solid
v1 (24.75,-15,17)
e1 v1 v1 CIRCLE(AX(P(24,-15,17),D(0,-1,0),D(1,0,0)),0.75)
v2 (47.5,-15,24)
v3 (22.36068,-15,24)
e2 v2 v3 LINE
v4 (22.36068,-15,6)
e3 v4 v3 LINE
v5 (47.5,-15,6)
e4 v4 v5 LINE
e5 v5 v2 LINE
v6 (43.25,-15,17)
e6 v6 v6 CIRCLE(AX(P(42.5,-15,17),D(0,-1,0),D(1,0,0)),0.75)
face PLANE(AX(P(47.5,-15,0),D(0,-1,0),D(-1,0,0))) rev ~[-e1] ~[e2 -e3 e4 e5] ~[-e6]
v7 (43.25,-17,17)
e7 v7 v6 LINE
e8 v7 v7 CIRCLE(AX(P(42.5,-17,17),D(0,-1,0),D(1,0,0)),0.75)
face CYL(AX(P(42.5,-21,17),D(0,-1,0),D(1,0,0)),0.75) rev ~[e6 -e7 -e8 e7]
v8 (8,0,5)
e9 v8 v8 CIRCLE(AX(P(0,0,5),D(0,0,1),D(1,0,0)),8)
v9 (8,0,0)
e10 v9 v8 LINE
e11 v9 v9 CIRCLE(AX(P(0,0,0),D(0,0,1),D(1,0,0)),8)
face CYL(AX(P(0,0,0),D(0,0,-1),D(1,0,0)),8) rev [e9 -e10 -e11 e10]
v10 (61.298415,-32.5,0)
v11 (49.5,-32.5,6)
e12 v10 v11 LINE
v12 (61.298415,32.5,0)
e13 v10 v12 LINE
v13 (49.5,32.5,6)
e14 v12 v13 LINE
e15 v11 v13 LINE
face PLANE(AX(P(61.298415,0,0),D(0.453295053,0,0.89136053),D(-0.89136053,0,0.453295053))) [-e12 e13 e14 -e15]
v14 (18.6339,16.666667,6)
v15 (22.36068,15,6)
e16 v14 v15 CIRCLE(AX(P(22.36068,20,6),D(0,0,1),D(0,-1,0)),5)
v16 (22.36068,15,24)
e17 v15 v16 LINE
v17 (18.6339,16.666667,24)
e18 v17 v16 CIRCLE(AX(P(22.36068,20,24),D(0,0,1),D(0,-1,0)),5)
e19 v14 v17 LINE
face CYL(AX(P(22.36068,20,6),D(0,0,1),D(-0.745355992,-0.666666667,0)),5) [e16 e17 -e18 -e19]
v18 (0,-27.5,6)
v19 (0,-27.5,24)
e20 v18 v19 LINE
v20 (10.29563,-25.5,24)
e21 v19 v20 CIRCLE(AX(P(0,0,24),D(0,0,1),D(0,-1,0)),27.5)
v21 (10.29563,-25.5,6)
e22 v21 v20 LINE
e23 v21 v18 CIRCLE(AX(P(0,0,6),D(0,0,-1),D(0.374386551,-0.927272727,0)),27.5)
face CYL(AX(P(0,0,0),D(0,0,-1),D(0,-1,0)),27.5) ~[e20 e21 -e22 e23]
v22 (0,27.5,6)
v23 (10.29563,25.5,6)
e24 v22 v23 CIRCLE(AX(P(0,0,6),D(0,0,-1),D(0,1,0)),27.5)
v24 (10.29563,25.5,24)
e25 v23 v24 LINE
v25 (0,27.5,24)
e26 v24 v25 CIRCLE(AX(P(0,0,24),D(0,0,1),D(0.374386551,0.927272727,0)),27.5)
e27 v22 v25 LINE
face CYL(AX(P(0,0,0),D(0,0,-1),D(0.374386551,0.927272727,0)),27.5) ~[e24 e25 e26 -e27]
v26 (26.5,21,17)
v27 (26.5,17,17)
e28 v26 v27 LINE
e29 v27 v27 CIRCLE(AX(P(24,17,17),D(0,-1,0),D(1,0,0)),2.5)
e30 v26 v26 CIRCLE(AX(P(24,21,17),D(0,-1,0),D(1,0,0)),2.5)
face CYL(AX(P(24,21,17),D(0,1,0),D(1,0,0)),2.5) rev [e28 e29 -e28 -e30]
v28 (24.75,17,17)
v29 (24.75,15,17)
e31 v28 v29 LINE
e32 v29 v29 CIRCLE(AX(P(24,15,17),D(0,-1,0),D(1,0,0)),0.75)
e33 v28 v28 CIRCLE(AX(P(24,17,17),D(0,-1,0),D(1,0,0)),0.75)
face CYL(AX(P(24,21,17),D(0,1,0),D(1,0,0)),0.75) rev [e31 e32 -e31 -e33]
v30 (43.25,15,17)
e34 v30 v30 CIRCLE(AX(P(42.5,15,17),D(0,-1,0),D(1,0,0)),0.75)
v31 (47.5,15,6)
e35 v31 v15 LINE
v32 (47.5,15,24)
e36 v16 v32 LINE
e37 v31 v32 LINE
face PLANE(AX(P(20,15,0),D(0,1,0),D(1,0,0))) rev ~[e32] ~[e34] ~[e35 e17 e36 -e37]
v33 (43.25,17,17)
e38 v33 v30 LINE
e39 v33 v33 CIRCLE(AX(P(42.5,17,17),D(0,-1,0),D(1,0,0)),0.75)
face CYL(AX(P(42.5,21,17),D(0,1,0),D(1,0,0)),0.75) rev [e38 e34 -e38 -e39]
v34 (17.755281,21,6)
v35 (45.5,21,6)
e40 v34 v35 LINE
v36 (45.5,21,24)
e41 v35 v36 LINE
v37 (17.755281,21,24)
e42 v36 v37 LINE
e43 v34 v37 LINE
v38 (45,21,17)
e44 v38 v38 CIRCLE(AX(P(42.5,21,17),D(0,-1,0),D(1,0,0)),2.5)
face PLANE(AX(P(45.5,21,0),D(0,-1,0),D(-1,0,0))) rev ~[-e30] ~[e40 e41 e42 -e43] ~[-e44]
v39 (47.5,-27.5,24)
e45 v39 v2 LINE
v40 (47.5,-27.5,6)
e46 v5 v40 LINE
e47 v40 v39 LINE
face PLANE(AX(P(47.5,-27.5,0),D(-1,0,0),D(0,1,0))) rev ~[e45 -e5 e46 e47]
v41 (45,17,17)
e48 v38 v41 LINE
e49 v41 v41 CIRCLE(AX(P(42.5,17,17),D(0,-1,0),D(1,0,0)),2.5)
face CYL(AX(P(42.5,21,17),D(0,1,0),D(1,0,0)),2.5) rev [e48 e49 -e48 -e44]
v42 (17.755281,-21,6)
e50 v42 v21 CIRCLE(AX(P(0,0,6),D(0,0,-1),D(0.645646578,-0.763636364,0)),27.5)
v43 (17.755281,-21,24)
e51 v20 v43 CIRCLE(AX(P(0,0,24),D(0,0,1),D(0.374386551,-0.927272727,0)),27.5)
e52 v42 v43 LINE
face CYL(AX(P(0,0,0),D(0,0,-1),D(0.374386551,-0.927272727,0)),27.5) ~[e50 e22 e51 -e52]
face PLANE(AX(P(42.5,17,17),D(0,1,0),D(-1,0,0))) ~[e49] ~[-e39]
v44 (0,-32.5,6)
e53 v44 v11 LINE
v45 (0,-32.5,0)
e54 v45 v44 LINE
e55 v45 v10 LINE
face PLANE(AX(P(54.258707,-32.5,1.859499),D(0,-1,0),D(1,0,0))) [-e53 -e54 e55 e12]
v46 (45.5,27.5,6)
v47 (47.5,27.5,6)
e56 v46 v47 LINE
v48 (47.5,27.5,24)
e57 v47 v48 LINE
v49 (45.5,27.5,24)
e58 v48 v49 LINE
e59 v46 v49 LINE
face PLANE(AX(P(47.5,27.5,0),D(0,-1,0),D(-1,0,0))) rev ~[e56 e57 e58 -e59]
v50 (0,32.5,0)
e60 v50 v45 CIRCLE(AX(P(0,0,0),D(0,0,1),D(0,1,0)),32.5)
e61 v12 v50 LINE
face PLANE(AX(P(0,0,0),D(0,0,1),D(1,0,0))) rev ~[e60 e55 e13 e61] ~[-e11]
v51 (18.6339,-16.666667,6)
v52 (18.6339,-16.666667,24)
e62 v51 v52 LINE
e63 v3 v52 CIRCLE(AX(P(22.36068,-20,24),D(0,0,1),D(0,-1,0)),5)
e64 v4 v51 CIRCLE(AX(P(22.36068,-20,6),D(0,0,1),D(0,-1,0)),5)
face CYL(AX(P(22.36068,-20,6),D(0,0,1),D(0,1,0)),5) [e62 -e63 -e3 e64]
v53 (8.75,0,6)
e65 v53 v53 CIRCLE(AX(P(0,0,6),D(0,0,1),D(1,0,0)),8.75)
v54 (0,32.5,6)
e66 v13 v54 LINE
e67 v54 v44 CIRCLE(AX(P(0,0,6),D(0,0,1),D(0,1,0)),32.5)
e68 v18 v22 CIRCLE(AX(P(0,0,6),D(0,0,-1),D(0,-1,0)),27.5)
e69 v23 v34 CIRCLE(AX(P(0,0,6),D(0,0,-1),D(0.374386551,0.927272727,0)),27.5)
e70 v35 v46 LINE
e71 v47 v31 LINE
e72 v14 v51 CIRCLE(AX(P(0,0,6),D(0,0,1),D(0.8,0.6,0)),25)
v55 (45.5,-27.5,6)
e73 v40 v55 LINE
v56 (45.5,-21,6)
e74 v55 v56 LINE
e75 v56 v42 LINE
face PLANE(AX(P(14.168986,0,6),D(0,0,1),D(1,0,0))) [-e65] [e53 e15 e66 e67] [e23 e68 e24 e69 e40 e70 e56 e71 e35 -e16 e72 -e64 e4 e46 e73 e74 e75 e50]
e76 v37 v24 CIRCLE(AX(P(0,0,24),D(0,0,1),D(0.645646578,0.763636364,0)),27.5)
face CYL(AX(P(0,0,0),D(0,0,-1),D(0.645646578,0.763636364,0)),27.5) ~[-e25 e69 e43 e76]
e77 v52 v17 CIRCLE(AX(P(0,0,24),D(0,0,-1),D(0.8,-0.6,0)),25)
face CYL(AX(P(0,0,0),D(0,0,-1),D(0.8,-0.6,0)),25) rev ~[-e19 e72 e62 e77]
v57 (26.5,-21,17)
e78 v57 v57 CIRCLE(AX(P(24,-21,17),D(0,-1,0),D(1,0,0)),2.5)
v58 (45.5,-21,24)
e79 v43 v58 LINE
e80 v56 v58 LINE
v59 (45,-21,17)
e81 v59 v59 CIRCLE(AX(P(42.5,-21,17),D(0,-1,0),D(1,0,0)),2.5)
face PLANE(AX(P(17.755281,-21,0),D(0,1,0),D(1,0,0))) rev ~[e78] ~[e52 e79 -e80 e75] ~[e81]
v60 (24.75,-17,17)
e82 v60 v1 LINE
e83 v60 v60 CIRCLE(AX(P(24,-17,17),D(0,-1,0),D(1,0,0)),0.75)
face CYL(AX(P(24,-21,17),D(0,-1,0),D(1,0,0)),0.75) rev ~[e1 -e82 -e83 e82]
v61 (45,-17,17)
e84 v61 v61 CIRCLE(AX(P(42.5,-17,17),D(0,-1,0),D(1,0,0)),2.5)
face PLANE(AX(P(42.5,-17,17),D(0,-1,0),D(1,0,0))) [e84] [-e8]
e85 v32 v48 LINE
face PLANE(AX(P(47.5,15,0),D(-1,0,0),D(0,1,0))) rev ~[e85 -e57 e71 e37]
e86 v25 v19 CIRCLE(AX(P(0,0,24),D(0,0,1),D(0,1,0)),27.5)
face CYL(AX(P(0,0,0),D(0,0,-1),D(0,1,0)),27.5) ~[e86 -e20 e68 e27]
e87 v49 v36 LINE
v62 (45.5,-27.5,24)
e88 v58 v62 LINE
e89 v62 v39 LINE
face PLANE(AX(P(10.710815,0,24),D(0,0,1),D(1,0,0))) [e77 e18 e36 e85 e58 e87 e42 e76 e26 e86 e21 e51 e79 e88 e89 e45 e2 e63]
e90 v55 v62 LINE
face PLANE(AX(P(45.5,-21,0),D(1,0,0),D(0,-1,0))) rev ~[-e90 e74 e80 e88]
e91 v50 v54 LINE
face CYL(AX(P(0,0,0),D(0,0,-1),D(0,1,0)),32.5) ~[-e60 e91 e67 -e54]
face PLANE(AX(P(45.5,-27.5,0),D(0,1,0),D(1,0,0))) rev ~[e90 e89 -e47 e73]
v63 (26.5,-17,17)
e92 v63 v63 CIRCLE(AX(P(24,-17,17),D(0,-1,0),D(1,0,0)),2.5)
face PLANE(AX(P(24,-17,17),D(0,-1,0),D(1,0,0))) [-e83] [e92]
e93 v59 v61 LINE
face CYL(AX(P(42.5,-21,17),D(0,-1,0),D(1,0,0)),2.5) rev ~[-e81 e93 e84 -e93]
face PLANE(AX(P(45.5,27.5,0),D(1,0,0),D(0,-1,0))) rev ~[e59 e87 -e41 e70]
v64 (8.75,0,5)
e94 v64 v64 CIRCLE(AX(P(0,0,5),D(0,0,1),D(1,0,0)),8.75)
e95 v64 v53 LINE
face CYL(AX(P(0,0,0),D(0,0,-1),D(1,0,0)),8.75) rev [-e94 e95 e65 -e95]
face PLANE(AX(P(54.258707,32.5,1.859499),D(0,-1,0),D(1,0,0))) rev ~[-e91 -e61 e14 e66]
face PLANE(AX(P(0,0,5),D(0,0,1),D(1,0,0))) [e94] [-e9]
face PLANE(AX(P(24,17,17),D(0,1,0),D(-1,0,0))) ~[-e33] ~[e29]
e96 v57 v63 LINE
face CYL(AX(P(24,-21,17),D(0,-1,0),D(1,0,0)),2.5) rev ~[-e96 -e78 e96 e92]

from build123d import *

# Parameters (mm, degrees)
F1_DEPTH = 24
F0_R     = 8.75
F2_DEPTH = 6
F4_DEPTH = 32.5
F5_R     = 5
F6_R     = 0.75
F7_DEPTH = 6
F6_R_2   = 2.5
F8_DEPTH = 4
F0_R_2   = 8
F9_DEPTH = 5


# Not quite as in the source:
# - a pattern or mirror of a feature is missing from the dataset's text; its kind, count and spacing are read off the source's solid


with BuildPart() as f1:
    # F0 (on Top) → F1 (new body)
    with BuildSketch(Plane.XY):
        with BuildLine():
            ThreePointArc((20, -15), (-25, 0), (20, 15))
            Line((20, 15), (47.5, 15))
            Line((47.5, 15), (47.5, 27.5))
            Line((47.5, 27.5), (45.5, 27.5))
            Line((45.5, 27.5), (45.5, 21))
            Line((45.5, 21), (39.5, 21))
            Line((39.5, 21), (28, 21))
            Line((28, 21), (17.7552809046, 21))
            ThreePointArc((17.7552809046, 21), (14.2047844975, 23.5472736719), (10.295630141, 25.5))
            ThreePointArc((10.295630141, 25.5), (5.2440442409, 26.9953699734), (0, 27.5))
            ThreePointArc((0, 27.5), (-27.5, 0), (0, -27.5))
            ThreePointArc((0, -27.5), (5.2440442409, -26.9953699734), (10.295630141, -25.5))
            ThreePointArc((10.295630141, -25.5), (14.2047844975, -23.5472736719), (17.7552809046, -21))
            Line((17.7552809046, -21), (28, -21))
            Line((28, -21), (39.5, -21))
            Line((39.5, -21), (45.5, -21))
            Line((45.5, -21), (45.5, -27.5))
            Line((45.5, -27.5), (47.5, -27.5))
            Line((47.5, -27.5), (47.5, -15))
            Line((47.5, -15), (20, -15))
        make_face()
    extrude(amount=F1_DEPTH)

    # F0 (on Top) → F2 (join)
    with BuildSketch(Plane.XY):
        with BuildLine():
            Line((47.5, 15), (20, 15))
            ThreePointArc((20, 15), (-25, 0), (20, -15))
            Line((20, -15), (47.5, -15))
            Line((47.5, -15), (47.5, 15))
        make_face()
        Circle(F0_R, mode=Mode.SUBTRACT)
        with BuildLine():
            Line((45.5, 21), (45.5, 27.5))
            Line((45.5, 27.5), (0, 27.5))
            ThreePointArc((0, 27.5), (5.2440442409, 26.9953699734), (10.295630141, 25.5))
            ThreePointArc((10.295630141, 25.5), (14.2047844975, 23.5472736719), (17.7552809046, 21))
            Line((17.7552809046, 21), (28, 21))
            Line((28, 21), (39.5, 21))
            Line((39.5, 21), (45.5, 21))
        make_face()
        with BuildLine():
            Line((0, -27.5), (45.5, -27.5))
            Line((45.5, -27.5), (45.5, -21))
            Line((45.5, -21), (39.5, -21))
            Line((39.5, -21), (28, -21))
            Line((28, -21), (17.7552809046, -21))
            ThreePointArc((17.7552809046, -21), (14.2047844975, -23.5472736719), (10.295630141, -25.5))
            ThreePointArc((10.295630141, -25.5), (5.2440442409, -26.9953699734), (0, -27.5))
        make_face()
        Polygon((47.5, 27.5), (47.5, 15), (47.5, -15), (47.5, -27.5), (49.5, -27.5), (49.5, 27.5), align=None)
        with BuildLine():
            Line((45.5, 27.5), (47.5, 27.5))
            Line((47.5, 27.5), (49.5, 27.5))
            Line((49.5, 27.5), (49.5, 32.5))
            Line((49.5, 32.5), (0, 32.5))
            ThreePointArc((0, 32.5), (-32.5, 0), (0, -32.5))
            Line((0, -32.5), (49.5, -32.5))
            Line((49.5, -32.5), (49.5, -27.5))
            Line((49.5, -27.5), (47.5, -27.5))
            Line((47.5, -27.5), (45.5, -27.5))
            Line((45.5, -27.5), (0, -27.5))
            ThreePointArc((0, -27.5), (-27.5, 0), (0, 27.5))
            Line((0, 27.5), (45.5, 27.5))
        make_face()
    extrude(amount=F2_DEPTH)

    # F3 (on Front) → F4 (join, symmetric)
    with BuildSketch(Plane.XZ):
        Polygon((49.5, 6), (49.5, 0), (61.2984150648, 0), align=None)
    extrude(amount=F4_DEPTH, both=True)

    # F5
    f5_edges = [f1.edges().sort_by_distance(p)[0] for p in [
        (20, 15, 15),
        (20, -15, 15),
    ]]
    fillet(f5_edges, radius=F5_R)

    # F6 (on face) → F7 (cut, through all)
    with BuildSketch(Plane.XZ.offset(21)):
        with Locations((24, 17)):
            Circle(F6_R)
        with Locations((42.5, 17)):
            Circle(F6_R)
    f7 = extrude(amount=-F7_DEPTH, mode=Mode.SUBTRACT)

    # F7_copies: F7 across plane
    add(f7.mirror(Plane.ZX), mode=Mode.SUBTRACT)

    # F6 (on face) → F8 (cut)
    with BuildSketch(Plane.XZ.offset(21)):
        with Locations((24, 17)):
            Circle(F6_R_2)
        with Locations((24, 17)):
            Circle(F6_R, mode=Mode.SUBTRACT)
        with Locations((42.5, 17)):
            Circle(F6_R_2)
        with Locations((42.5, 17)):
            Circle(F6_R, mode=Mode.SUBTRACT)
    f8 = extrude(amount=-F8_DEPTH, mode=Mode.SUBTRACT)

    # F8_copies: F8 across plane
    add(f8.mirror(Plane.ZX), mode=Mode.SUBTRACT)

    # F0 (on Top) → F9 (join)
    with BuildSketch(Plane.XY):
        Circle(F0_R)
        Circle(F0_R_2, mode=Mode.SUBTRACT)
    extrude(amount=F9_DEPTH)


solid = f1.part
